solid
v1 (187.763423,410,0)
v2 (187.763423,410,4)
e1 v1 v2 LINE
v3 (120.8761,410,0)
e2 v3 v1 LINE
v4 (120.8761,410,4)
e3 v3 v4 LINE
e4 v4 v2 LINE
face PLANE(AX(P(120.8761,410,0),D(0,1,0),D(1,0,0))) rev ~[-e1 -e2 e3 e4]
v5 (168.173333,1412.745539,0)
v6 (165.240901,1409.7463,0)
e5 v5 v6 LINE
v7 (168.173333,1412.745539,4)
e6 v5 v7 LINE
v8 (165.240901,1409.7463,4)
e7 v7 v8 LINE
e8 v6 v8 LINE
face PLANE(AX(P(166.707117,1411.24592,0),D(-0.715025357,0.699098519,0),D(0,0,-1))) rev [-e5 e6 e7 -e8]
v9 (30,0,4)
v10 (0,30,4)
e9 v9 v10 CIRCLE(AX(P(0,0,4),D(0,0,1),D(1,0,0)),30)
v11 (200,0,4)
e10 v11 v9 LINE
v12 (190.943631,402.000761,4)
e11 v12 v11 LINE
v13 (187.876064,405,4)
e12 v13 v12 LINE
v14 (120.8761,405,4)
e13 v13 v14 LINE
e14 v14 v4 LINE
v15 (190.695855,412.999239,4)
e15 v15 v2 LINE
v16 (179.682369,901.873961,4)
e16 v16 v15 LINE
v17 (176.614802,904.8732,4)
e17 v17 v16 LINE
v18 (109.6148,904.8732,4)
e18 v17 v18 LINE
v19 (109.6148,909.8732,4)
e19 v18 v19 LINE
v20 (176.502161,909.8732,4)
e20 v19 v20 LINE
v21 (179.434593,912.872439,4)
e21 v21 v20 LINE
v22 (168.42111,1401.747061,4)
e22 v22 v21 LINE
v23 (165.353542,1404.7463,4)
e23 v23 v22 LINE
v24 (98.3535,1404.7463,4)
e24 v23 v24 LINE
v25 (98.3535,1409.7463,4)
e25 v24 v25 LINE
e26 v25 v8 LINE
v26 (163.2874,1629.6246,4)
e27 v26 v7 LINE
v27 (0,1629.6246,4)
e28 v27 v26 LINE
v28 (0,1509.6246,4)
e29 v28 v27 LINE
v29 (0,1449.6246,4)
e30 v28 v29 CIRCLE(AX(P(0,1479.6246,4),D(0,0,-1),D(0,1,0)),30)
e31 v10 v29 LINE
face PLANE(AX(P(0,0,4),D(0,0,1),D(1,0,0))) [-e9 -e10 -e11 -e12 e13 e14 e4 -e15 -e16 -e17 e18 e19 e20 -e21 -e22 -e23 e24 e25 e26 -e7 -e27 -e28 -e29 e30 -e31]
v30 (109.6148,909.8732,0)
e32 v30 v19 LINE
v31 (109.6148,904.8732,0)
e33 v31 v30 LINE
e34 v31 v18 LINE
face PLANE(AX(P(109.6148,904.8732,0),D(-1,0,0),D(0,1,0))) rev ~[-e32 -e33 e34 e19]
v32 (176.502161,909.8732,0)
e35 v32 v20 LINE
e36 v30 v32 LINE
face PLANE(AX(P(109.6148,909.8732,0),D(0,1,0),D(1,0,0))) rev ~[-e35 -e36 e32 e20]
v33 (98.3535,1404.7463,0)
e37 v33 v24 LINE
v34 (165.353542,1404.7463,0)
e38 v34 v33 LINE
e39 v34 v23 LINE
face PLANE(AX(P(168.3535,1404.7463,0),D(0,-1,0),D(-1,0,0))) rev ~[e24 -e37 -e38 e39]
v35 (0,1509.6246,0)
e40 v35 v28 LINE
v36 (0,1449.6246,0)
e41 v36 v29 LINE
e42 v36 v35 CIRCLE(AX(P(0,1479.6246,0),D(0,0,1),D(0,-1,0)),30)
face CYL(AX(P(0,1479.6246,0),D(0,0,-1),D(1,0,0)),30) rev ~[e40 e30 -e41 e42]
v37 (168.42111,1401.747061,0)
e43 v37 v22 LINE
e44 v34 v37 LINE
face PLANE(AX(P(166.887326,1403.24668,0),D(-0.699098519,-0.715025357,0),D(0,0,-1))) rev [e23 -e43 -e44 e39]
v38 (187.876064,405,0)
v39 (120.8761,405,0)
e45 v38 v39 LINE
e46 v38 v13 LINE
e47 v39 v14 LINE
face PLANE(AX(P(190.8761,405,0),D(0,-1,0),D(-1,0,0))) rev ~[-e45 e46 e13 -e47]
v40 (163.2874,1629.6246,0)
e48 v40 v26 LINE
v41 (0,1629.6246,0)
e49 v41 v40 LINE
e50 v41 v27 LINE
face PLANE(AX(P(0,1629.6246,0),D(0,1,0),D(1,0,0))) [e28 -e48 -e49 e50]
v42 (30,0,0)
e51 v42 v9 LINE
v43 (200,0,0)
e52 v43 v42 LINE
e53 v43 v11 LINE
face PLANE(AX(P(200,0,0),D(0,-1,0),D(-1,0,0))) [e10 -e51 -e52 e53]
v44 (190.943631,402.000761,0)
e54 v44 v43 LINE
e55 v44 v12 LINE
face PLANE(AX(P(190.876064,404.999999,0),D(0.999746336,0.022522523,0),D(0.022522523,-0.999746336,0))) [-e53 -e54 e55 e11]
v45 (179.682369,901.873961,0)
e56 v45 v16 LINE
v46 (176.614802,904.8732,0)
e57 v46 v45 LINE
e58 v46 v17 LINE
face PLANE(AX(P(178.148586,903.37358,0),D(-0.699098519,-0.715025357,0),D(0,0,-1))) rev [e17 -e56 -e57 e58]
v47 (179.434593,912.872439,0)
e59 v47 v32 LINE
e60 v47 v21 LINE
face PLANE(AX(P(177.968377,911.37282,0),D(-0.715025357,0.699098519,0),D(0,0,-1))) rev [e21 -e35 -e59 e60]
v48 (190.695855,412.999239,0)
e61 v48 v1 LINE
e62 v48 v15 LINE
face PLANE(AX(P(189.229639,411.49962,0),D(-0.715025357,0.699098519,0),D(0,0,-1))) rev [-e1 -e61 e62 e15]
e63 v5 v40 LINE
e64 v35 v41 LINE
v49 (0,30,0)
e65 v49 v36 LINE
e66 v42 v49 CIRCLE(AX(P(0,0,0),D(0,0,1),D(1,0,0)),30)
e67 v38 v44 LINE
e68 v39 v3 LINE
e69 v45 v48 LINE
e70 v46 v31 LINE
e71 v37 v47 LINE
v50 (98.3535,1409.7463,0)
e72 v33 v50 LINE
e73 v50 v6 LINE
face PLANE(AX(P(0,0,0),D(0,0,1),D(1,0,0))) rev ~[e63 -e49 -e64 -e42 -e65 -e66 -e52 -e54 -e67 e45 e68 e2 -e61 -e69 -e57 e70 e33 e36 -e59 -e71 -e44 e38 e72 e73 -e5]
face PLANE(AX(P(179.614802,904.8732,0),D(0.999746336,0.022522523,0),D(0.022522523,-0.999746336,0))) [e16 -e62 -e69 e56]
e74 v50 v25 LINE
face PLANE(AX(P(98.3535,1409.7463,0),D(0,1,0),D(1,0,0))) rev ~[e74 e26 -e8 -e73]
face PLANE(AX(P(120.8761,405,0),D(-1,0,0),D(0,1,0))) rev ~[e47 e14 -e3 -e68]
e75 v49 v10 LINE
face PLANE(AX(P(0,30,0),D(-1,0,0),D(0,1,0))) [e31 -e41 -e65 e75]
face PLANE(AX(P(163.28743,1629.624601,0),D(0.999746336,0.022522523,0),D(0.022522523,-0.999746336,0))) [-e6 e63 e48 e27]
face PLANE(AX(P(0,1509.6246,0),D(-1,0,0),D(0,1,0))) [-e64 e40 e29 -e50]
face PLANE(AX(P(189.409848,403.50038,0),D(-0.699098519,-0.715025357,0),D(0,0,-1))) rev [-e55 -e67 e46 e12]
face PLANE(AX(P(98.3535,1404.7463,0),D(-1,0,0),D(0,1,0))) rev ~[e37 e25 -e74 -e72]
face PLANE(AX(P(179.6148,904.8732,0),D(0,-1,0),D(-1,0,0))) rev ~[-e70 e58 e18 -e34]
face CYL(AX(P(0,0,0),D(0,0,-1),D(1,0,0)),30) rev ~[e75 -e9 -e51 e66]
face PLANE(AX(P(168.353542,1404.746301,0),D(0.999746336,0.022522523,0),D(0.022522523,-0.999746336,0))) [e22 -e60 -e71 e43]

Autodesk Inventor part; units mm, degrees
ref_plane "YZ Plane" through (0, 0, 0) normal (1, 0, 0) x (0, 1, 0)
ref_plane "XZ Plane" through (0, 0, 0) normal (0, 1, 0) x (-1, 0, 0)
ref_plane "XY Plane" through (0, 0, 0) normal (0, 0, 1) x (1, 0, 0)
sketch "Sketch1" plane through (0, 0, 0) normal (0, 0, 1) x (1, 0, 0)
  line L0 (0, 0) -> (0, 4438.8737)
  line L1 (0, 4438.8737) -> (100, 4438.8737)
  line L2 (100, 4438.8737) -> (200, 0)
  line L3 (200, 0) -> (0, 0)
  circle A0 centre (0, 0) radius 30
  line L4 (0, 1479.6246) -> (166.6667, 1479.6246)
  line L5 (0, 2959.2492) -> (133.3333, 2959.2492)
  circle A1 centre (0, 1479.6246) radius 30
  circle A2 centre (0, 2959.2492) radius 30
  line L6 (190.8761, 405) -> (120.8761, 405)
  line L7 (120.8761, 405) -> (120.8761, 410)
  line L8 (120.8761, 410) -> (190.8761, 410)
  line L9 (190.8761, 410) -> (190.8761, 405)
  line L10 (109.6148, 909.8732) -> (179.6148, 909.8732)
  line L11 (179.6148, 904.8732) -> (109.6148, 904.8732)
  line L12 (109.6148, 904.8732) -> (109.6148, 909.8732)
  line L13 (179.6148, 909.8732) -> (179.6148, 904.8732)
  line L14 (98.3535, 1409.7463) -> (168.3535, 1409.7463)
  line L15 (168.3535, 1404.7463) -> (98.3535, 1404.7463)
  line L16 (98.3535, 1404.7463) -> (98.3535, 1409.7463)
  line L17 (168.3535, 1409.7463) -> (168.3535, 1404.7463)
  line L18 (87.0923, 1909.6195) -> (157.0923, 1909.6195)
  line L19 (157.0923, 1904.6195) -> (87.0923, 1904.6195)
  line L20 (87.0923, 1904.6195) -> (87.0923, 1909.6195)
  line L21 (157.0923, 1909.6195) -> (157.0923, 1904.6195)
  line L22 (75.831, 2409.4927) -> (145.831, 2409.4927)
  line L23 (145.831, 2404.4927) -> (75.831, 2404.4927)
  line L24 (75.831, 2404.4927) -> (75.831, 2409.4927)
  line L25 (145.831, 2409.4927) -> (145.831, 2404.4927)
  line L26 (64.5698, 2909.3658) -> (134.5698, 2909.3658)
  line L27 (134.5698, 2904.3658) -> (64.5698, 2904.3658)
  line L28 (64.5698, 2904.3658) -> (64.5698, 2909.3658)
  line L29 (134.5698, 2909.3658) -> (134.5698, 2904.3658)
  line L30 (53.3085, 3409.239) -> (123.3085, 3409.239)
  line L31 (123.3085, 3404.239) -> (53.3085, 3404.239)
  line L32 (53.3085, 3404.239) -> (53.3085, 3409.239)
  line L33 (123.3085, 3409.239) -> (123.3085, 3404.239)
  line L34 (42.0472, 3909.1122) -> (112.0472, 3909.1122)
  line L35 (112.0472, 3904.1122) -> (42.0472, 3904.1122)
  line L36 (42.0472, 3904.1122) -> (42.0472, 3909.1122)
  line L37 (112.0472, 3909.1122) -> (112.0472, 3904.1122)
  line L38 (0, 1629.6246) -> (163.2874, 1629.6246)
  line L39 (0, 3079.2492) -> (130.6299, 3079.2492)
  point P0 (30, 2959.2492)
  point P1 (0, 2929.2492)
  point P2 (0, 1509.6246)
  point P3 (0, 1449.6246)
  point P4 (0, 30)
  point P5 (30, 0)
  point P6 (190.7634, 410)
  point P7 (179.5022, 909.8732)
  point P8 (168.3535, 1404.7463)
  point P9 (168.2409, 1409.7463)
  point P10 (30, 1479.6246)
  dimension "d65" = 100
  dimension "d67" = 200
  dimension "d68" = 60
  dimension "d69" = 1480
  dimension "d70" = 1480
  dimension "d71" = 1480
  dimension "d72" = 5
  dimension "d73" = 70
  dimension "d74" = 410
  dimension "d77" = 500
  dimension "d82" = 120
  dimension "d83" = 150
extrude "Plate3" add sketch "Sketch1" along normal blind 4 contours L38 L2 L4 A1 L0 | L4 L2 L14 L16 L15 L10 L12 L11 L8 L7 L6 L3 A0 L0 A1
chamfer "Corner Chamfer2" distance 3 angle 45 6 edges at (190.7634, 410, 2) (190.8761, 405, 2) (179.6148, 904.8732, 2) (179.5022, 909.8732, 2) (168.3535, 1404.7463, 2) (168.2409, 1409.7463, 2)
equation "\"BendRadius\" = Thickness"
equation "\"BendReliefWidth\" = Thickness"
equation "\"BendReliefDepth\" = 0.5 * Thickness"
equation "\"CornerReliefSize\" = 4 * Thickness"
equation "\"MinimumRemnant\" = 2 * Thickness"
equation "\"TransitionRadius\" = BendRadius"
equation "\"JacobiRadiusSize\" = BendRadius"
equation "\"GapSize\" = Thickness"
equation "\"Thickness\" = 4"
properties part number "GBK 3112 central main rib_CPY" material "Steel"
